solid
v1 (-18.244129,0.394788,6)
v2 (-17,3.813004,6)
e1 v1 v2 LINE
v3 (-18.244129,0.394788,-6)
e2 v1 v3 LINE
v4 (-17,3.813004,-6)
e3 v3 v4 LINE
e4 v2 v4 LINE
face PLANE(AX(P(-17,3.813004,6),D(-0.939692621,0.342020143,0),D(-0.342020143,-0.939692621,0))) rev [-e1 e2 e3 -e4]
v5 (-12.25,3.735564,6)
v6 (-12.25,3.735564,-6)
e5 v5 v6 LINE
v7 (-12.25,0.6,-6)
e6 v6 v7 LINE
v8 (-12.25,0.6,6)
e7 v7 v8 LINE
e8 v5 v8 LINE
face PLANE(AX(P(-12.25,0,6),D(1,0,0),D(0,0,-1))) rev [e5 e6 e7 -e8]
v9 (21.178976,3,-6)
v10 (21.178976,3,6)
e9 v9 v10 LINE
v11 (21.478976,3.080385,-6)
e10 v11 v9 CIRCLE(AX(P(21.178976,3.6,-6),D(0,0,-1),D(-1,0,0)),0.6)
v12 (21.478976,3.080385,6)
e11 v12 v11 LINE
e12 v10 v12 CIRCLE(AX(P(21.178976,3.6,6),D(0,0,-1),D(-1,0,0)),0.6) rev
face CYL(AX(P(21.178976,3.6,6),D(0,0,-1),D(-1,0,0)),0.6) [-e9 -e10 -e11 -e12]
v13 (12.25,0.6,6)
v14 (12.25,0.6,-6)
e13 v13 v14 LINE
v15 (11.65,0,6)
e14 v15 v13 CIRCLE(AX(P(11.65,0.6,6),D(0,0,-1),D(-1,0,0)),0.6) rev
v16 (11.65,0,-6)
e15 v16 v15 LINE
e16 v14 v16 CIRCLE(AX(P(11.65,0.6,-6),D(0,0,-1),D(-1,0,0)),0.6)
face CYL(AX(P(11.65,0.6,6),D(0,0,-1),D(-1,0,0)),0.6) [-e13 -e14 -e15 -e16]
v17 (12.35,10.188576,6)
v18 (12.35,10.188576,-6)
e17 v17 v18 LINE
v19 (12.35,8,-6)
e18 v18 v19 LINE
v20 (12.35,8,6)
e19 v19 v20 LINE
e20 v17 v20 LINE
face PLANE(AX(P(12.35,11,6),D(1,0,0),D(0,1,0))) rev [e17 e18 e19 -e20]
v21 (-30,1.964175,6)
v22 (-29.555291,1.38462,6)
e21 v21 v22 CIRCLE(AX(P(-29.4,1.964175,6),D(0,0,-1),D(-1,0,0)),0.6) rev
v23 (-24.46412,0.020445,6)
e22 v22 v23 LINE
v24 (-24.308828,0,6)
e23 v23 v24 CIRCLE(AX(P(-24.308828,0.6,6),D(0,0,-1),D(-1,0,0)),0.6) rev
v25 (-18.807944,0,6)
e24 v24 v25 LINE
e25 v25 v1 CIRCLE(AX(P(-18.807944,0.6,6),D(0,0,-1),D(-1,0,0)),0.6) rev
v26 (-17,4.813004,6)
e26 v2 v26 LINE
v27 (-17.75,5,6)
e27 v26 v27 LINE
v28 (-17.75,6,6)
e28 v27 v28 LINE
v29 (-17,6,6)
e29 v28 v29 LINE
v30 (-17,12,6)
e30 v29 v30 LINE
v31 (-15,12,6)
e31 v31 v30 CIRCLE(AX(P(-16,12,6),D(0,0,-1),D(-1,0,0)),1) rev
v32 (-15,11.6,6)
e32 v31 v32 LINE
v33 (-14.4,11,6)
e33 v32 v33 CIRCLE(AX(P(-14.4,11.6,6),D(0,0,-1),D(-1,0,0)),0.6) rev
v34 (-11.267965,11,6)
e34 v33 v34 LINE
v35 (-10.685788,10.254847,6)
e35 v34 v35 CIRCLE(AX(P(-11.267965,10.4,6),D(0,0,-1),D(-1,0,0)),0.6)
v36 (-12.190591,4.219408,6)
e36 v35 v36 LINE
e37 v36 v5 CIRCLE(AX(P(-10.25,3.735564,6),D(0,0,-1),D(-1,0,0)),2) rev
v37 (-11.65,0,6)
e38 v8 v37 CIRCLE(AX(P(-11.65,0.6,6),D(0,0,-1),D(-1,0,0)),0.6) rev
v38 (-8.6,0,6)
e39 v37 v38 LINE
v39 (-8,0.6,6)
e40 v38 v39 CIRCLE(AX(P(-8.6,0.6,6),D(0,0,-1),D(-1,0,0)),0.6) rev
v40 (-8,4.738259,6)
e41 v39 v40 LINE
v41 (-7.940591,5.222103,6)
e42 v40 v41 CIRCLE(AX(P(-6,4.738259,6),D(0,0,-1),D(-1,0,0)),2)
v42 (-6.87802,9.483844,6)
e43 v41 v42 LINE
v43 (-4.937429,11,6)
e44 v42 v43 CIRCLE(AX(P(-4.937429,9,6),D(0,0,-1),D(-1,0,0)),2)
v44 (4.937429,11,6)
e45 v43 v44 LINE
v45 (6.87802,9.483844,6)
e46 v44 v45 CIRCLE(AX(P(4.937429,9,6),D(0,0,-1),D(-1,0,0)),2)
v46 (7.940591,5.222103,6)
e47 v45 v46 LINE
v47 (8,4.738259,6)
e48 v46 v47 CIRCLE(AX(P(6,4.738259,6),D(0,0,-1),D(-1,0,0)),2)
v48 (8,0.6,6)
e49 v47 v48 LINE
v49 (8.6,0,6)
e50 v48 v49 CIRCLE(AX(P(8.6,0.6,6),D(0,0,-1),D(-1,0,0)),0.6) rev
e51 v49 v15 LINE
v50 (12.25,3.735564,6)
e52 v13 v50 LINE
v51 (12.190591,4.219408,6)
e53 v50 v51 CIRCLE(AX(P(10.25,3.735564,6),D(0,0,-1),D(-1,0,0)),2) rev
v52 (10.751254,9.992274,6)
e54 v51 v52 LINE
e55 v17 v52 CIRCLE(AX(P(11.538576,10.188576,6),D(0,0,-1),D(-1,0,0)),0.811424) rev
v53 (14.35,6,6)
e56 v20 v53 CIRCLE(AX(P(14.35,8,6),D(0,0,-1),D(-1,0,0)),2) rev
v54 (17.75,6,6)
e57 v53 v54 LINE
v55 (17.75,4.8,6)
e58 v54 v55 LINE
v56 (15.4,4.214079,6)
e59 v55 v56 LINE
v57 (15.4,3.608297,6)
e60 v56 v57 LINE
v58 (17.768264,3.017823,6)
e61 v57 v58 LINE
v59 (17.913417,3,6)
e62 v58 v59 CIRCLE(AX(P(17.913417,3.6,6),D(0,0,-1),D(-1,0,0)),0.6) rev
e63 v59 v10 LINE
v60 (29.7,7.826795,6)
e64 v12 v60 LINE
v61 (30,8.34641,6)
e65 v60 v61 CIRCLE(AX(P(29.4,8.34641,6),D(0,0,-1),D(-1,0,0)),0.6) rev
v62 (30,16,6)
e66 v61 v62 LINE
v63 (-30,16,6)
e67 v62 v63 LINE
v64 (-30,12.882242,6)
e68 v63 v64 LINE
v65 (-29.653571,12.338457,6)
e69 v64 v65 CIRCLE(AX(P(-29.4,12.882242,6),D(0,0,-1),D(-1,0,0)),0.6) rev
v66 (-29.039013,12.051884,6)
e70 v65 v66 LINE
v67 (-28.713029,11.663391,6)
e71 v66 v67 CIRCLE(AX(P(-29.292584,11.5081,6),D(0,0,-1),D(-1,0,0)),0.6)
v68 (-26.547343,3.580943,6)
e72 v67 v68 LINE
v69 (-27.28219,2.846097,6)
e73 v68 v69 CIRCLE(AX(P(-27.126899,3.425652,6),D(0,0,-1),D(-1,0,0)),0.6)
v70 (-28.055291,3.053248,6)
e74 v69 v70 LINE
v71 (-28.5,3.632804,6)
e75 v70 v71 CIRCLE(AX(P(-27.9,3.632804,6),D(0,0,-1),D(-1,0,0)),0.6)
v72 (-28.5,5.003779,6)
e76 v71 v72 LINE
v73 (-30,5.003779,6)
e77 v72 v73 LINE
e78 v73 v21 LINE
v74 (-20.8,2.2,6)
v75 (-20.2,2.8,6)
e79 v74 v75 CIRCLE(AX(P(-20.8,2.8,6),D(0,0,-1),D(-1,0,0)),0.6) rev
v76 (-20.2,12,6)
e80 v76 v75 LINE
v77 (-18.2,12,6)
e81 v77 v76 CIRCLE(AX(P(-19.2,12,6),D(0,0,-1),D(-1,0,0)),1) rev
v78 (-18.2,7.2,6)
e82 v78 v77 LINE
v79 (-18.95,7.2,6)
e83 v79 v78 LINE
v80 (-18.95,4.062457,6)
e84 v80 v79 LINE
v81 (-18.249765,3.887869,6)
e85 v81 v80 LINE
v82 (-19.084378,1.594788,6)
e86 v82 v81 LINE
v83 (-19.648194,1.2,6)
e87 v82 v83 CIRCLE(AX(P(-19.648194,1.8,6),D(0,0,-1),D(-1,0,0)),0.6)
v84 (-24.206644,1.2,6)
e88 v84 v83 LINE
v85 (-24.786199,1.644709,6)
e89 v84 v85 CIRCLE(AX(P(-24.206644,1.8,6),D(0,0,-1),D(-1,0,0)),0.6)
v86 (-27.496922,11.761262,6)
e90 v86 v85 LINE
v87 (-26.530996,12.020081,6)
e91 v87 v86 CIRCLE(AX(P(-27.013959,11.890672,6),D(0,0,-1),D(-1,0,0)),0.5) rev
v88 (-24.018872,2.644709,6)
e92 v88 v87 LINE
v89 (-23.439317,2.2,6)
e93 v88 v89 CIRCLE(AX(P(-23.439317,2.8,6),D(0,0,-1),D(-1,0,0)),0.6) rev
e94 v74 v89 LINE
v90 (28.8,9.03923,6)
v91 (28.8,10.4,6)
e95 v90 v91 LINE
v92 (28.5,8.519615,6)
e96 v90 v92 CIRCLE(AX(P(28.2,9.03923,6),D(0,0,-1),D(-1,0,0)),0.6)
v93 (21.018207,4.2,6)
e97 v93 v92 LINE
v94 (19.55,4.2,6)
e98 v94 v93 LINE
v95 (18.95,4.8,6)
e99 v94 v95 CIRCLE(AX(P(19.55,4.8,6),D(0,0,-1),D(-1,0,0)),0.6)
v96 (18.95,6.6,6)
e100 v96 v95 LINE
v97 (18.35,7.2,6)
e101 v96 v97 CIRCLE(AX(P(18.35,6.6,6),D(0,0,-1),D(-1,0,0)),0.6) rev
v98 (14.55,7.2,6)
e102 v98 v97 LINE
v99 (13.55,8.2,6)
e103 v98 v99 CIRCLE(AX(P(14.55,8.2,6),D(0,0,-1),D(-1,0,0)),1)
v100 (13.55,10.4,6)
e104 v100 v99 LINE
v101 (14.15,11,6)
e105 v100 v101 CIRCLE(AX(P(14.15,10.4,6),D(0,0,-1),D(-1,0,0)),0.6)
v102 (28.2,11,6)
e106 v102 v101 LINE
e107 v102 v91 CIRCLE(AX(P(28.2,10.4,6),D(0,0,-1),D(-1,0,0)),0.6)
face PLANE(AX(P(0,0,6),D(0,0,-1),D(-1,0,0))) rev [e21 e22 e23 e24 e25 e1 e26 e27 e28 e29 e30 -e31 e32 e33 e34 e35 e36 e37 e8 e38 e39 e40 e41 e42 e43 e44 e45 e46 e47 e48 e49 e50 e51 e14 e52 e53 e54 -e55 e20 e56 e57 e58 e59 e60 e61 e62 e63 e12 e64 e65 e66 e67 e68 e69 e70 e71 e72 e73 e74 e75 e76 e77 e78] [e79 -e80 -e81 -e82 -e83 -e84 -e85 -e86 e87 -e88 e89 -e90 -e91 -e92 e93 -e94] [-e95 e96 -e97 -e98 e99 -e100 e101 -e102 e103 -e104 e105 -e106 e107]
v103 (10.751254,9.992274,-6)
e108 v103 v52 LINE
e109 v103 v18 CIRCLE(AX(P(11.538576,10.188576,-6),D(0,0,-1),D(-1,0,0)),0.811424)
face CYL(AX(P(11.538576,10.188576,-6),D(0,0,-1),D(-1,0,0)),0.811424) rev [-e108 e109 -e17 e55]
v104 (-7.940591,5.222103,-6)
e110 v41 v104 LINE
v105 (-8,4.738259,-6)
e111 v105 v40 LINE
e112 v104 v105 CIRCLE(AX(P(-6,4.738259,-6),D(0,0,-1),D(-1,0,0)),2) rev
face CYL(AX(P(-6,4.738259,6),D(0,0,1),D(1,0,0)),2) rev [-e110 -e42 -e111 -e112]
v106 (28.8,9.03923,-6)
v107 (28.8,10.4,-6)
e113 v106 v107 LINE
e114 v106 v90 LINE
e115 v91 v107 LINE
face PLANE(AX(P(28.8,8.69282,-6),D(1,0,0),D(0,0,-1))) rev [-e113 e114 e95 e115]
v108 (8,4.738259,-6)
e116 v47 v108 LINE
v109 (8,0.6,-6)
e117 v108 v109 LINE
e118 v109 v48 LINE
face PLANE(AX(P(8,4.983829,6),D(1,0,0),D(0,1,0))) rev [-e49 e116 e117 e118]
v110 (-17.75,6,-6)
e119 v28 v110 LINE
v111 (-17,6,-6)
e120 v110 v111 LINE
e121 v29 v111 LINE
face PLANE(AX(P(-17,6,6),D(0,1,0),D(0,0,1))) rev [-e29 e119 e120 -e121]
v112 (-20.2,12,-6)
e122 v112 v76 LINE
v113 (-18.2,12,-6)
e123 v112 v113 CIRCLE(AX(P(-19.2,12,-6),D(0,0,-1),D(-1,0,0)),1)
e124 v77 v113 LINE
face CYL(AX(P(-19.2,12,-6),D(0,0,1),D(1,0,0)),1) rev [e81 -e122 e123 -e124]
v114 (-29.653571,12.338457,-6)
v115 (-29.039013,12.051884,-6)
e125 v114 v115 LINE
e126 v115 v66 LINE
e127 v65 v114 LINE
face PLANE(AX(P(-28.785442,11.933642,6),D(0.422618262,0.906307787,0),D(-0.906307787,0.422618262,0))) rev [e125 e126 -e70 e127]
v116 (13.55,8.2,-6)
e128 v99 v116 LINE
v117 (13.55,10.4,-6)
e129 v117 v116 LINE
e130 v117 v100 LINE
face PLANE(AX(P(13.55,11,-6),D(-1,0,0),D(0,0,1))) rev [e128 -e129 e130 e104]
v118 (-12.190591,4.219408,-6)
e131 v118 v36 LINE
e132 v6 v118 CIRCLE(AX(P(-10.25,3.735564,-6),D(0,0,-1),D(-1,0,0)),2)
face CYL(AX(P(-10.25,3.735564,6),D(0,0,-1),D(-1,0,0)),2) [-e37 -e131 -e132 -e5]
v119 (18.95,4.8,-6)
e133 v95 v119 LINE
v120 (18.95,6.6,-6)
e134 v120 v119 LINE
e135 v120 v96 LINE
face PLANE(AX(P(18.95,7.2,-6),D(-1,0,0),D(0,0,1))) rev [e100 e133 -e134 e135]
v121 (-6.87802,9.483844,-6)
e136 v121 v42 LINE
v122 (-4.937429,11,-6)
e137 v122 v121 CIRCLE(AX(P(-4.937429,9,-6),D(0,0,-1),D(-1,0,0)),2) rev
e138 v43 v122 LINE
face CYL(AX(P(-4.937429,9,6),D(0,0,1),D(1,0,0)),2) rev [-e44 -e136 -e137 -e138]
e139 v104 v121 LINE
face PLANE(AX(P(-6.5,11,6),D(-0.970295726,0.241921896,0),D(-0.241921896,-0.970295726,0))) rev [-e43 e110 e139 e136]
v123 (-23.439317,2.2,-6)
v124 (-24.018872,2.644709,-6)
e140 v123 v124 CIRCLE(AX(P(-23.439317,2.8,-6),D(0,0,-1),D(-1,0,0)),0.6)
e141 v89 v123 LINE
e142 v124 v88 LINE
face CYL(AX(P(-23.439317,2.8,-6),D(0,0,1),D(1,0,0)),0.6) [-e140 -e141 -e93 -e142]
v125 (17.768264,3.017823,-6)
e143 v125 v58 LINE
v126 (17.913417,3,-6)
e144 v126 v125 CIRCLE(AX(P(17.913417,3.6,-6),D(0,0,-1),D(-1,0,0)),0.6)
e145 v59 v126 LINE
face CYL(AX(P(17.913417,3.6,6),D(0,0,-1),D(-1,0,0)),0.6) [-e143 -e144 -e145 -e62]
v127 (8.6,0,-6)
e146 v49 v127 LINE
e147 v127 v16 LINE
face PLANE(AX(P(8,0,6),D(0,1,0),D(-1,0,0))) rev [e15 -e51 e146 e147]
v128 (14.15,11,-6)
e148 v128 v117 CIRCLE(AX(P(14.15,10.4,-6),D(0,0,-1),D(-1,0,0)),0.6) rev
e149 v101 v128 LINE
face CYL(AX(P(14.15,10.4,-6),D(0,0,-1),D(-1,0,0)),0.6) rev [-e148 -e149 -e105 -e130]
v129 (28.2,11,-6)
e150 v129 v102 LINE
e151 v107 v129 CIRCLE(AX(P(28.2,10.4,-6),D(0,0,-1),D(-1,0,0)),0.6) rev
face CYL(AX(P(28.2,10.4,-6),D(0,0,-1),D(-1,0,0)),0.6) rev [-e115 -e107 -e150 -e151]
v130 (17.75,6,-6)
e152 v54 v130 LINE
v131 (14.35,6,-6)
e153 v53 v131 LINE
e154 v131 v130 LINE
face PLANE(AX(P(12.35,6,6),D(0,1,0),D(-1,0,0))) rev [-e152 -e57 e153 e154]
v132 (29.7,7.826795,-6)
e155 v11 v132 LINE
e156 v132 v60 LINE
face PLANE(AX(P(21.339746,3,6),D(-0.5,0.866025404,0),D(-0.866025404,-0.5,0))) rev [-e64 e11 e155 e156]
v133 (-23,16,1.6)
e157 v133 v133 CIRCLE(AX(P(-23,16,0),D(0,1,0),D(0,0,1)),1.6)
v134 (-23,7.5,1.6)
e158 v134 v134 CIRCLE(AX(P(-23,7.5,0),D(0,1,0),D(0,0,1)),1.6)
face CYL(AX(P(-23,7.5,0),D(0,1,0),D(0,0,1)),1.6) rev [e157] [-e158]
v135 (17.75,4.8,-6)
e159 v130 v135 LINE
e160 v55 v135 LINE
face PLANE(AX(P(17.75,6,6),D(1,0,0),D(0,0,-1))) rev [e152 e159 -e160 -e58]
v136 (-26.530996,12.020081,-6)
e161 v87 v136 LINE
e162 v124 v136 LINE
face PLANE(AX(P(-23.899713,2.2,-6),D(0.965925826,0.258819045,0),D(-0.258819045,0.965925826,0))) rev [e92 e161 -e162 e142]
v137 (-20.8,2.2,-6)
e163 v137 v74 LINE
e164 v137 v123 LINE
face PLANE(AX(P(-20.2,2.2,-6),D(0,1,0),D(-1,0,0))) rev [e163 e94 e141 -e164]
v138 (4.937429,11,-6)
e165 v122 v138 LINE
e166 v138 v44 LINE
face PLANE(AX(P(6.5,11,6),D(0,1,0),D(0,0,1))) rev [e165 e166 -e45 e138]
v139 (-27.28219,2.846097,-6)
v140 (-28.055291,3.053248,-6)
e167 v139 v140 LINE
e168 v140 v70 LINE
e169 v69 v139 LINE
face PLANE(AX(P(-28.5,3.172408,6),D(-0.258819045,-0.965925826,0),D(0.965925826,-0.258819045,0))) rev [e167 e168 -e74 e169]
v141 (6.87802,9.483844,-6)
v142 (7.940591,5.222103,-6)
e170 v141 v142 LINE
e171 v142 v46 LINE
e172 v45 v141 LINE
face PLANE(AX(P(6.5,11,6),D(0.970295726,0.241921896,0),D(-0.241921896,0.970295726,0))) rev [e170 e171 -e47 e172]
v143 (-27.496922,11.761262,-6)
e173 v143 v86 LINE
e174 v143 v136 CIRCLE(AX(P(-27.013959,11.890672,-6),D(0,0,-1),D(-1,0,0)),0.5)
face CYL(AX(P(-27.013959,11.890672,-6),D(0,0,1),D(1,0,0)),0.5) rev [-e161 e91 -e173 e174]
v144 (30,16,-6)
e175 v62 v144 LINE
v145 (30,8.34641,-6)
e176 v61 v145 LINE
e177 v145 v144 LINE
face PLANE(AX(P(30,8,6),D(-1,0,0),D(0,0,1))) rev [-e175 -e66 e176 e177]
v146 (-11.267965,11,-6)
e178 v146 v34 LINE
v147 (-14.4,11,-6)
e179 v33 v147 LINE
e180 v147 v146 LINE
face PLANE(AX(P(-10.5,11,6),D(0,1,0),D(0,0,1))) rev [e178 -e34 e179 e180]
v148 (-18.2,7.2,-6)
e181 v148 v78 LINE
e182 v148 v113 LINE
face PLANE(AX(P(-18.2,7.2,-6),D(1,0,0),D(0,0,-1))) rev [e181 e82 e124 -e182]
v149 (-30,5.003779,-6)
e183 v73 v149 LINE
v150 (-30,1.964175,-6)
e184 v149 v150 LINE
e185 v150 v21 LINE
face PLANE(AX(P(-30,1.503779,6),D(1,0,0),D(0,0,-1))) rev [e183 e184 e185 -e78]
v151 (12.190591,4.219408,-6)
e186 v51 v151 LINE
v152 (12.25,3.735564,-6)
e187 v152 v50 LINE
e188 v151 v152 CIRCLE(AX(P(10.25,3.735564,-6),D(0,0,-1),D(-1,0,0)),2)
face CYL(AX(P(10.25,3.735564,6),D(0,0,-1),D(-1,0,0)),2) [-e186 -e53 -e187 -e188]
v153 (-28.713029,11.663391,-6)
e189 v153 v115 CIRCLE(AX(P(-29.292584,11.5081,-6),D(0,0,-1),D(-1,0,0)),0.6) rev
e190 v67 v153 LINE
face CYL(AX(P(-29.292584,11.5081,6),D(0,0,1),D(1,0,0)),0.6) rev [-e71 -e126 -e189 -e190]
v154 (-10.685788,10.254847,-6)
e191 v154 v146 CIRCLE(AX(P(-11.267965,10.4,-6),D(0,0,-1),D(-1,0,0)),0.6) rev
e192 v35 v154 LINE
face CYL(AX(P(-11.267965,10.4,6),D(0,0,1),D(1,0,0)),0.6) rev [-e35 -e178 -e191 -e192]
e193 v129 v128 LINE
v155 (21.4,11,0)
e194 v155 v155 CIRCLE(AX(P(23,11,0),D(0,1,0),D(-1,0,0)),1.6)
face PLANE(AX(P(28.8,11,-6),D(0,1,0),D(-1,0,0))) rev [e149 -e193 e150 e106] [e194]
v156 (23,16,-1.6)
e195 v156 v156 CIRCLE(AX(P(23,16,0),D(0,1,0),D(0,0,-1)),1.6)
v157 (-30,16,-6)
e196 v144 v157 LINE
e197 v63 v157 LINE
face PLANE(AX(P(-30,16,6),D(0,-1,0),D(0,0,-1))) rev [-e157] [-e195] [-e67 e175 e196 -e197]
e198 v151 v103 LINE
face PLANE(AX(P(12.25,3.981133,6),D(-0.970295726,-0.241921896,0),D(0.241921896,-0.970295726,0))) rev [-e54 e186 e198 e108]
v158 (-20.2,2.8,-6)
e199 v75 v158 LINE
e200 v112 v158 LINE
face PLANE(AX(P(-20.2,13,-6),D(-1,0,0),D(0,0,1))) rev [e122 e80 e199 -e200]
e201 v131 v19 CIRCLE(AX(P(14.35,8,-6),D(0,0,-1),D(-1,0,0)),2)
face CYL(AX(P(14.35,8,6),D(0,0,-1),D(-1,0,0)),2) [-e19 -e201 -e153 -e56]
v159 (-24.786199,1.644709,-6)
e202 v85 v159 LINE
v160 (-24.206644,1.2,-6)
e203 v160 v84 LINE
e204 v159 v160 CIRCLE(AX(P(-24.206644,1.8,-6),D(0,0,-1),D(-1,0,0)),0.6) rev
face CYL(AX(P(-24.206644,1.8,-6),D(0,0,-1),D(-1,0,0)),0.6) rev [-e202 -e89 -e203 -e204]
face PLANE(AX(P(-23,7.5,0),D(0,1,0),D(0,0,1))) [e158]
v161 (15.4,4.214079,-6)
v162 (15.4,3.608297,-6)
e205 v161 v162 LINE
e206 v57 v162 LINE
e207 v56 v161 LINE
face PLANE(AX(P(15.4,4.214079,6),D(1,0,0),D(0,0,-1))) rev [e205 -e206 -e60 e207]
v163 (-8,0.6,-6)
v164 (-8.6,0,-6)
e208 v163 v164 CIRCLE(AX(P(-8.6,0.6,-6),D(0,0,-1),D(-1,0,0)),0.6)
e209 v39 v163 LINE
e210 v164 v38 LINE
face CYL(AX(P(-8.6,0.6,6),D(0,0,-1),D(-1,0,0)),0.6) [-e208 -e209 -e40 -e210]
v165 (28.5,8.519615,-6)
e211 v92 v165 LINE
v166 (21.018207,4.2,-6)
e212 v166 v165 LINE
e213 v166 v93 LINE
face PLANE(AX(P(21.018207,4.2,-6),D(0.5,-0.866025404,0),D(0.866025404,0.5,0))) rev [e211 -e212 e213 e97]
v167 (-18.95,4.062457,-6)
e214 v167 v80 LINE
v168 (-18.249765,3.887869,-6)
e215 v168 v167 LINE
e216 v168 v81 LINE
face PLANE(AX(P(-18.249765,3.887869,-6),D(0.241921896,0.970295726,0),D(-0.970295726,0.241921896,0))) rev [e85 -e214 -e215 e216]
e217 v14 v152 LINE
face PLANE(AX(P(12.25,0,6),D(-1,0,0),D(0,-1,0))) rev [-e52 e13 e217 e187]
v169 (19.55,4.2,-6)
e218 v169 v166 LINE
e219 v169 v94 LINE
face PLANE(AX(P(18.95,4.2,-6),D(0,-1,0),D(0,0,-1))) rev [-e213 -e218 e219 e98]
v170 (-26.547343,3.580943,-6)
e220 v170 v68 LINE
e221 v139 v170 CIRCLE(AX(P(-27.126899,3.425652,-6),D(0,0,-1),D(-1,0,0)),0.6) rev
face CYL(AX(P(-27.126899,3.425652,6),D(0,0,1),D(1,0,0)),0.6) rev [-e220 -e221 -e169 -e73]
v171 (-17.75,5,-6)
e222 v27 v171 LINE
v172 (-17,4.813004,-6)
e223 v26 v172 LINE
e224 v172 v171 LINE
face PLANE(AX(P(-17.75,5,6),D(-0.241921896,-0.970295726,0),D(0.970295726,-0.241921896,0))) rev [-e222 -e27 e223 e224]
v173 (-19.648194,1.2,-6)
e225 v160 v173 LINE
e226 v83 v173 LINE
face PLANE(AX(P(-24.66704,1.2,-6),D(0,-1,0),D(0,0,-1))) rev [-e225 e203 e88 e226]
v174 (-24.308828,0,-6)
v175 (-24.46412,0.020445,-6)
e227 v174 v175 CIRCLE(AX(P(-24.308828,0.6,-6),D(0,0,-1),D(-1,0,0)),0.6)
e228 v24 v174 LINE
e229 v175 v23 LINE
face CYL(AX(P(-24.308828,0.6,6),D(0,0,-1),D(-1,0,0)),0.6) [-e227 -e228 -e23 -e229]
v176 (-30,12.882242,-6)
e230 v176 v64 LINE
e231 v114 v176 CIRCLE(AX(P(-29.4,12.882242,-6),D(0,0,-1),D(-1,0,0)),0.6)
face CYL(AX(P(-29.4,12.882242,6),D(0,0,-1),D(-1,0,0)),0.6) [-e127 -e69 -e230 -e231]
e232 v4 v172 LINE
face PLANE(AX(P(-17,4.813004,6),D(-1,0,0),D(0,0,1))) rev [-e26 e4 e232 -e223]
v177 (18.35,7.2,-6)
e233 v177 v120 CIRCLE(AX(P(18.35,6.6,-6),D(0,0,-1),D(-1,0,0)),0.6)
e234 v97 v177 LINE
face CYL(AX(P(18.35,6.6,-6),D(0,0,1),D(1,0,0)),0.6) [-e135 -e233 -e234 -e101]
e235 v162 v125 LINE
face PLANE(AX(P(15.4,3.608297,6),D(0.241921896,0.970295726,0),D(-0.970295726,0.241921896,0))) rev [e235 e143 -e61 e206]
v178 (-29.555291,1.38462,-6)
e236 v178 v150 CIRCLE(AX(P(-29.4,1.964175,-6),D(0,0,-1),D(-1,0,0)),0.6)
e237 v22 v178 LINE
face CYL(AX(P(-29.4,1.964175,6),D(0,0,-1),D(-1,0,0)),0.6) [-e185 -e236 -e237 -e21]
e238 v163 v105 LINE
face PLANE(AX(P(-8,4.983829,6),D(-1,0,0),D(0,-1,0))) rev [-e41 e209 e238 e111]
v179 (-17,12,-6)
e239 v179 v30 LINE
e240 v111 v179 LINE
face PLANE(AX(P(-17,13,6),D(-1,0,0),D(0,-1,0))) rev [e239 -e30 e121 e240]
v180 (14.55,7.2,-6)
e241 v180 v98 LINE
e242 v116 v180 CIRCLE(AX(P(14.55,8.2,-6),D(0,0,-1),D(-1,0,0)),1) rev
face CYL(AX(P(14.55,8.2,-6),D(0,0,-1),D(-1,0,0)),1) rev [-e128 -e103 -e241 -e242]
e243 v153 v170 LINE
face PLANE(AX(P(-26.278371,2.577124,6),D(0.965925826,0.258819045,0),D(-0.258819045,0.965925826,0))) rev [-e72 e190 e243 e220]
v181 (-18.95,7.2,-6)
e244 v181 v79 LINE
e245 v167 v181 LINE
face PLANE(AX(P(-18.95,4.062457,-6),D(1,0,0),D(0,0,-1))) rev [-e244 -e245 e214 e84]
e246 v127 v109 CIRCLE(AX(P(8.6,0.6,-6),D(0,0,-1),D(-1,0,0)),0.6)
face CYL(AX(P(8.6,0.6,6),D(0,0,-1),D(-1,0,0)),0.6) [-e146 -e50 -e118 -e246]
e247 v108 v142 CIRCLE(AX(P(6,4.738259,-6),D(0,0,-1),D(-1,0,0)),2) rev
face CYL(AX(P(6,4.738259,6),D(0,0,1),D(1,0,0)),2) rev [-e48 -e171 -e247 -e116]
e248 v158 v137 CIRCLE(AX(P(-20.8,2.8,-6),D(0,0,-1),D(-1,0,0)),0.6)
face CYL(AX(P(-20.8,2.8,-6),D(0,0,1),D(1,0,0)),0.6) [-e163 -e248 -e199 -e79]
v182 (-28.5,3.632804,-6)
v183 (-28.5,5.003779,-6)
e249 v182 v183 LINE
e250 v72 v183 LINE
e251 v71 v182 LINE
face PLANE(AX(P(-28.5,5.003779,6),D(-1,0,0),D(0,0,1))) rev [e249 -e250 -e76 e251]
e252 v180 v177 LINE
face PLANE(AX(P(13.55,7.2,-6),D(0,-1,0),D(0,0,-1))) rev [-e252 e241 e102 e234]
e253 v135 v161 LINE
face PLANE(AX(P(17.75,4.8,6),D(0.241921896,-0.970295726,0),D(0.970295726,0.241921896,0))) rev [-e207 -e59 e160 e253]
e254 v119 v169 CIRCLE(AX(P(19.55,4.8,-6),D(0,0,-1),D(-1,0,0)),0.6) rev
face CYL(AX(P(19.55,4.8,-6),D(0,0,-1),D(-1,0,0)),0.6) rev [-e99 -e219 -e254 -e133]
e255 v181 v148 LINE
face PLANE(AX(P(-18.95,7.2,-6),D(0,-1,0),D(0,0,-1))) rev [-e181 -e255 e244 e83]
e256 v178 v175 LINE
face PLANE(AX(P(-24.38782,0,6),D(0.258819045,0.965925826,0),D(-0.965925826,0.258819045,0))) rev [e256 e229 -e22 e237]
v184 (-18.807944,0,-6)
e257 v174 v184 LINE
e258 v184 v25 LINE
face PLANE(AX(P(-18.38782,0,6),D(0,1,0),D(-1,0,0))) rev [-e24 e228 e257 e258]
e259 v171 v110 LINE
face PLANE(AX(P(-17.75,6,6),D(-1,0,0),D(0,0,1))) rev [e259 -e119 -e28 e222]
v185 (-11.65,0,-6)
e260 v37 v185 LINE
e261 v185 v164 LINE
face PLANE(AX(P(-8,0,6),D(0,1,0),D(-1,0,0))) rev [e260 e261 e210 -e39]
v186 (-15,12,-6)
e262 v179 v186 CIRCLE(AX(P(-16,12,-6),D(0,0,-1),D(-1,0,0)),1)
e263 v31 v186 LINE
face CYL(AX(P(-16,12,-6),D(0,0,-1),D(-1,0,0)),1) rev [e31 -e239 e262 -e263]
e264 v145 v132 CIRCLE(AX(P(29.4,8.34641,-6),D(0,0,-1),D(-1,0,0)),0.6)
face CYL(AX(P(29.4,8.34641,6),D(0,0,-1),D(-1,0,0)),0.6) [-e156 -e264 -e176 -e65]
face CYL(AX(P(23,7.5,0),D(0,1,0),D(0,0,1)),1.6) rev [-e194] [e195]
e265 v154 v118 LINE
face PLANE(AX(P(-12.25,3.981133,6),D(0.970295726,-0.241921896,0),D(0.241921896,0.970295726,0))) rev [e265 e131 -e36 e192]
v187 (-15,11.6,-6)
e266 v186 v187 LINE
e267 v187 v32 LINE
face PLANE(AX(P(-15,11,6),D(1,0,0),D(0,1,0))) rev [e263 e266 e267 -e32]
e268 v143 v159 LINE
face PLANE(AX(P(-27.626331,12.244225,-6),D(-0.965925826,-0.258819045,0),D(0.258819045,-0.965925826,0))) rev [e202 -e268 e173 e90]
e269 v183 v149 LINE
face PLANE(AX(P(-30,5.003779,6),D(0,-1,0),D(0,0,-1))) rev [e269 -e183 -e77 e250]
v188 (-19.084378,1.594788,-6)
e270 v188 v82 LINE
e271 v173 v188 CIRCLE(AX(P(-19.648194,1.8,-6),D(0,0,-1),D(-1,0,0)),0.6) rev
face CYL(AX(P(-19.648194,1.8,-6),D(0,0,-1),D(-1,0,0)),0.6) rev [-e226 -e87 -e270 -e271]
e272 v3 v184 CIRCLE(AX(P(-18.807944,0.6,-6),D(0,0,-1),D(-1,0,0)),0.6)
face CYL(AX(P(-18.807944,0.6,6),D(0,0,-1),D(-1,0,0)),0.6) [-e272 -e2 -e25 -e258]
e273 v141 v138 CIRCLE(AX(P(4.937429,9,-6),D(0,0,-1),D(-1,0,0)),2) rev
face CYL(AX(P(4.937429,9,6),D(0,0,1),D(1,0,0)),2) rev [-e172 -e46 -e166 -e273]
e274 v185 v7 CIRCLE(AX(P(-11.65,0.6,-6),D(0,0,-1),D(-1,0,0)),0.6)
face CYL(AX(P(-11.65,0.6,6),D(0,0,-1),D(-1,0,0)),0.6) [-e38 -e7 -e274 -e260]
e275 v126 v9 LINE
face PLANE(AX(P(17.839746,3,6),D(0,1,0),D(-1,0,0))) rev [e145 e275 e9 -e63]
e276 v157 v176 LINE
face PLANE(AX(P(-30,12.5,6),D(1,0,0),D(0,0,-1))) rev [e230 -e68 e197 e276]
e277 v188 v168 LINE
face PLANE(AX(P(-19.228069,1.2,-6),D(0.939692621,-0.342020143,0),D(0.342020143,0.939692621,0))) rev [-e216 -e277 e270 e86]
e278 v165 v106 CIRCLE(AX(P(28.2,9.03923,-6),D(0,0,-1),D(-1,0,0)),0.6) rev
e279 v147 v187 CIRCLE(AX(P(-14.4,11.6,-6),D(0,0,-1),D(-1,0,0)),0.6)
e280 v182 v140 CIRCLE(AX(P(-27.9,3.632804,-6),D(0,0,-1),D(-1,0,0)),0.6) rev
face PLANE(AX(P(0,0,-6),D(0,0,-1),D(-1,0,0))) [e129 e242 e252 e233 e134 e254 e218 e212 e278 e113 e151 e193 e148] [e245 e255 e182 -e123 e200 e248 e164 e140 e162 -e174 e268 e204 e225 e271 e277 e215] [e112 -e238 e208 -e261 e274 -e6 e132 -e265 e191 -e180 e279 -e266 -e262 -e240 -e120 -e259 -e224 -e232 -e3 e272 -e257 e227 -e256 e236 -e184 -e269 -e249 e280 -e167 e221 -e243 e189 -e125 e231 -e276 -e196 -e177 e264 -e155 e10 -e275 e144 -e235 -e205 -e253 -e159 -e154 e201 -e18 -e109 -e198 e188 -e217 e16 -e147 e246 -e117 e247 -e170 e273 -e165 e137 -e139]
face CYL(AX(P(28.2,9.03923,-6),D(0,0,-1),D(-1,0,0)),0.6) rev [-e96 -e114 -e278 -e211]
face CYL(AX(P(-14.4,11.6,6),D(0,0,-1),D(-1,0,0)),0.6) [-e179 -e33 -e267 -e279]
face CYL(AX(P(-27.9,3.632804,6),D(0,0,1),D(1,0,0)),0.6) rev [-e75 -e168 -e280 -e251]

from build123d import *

# Parameters (mm, degrees)
BOSS_EXTRUDE1_DEPTH     = 6
CUT_EXTRUDE1_DEPTH      = 35.525353003
CUT_EXTRUDE1_DEPTH_BACK = 35.525353003
FILLET1_R               = 2
FILLET2_R               = 1
FILLET3_R               = 0.811424
FILLET4_R               = 2
FILLET5_R               = 1
FILLET6_R               = 1
FILLET7_R               = 0.5
FILLET8_R               = 0.6
SKETCH4_R               = 1.6
CUT_EXTRUDE2_DEPTH      = 8.5


with BuildPart() as part:
    # Sketch2 → Boss-Extrude1 (new, symmetric)
    with BuildSketch(Plane.XY):
        Polygon((6.5, 11), (-6.5, 11), (-8, 4.9838286), (-8, 0), (-12.25, 0), (-12.25, 3.981133366), (-10.5, 11), (-15, 11), (-15, 13), (-17, 13), (-17, 6), (-17.75, 6), (-17.75, 5), (-17, 4.813003998), (-17, 3.813003998), (-18.387819958, 0), (-24.387819958, 0), (-30, 1.50377911), (-30, 5.00377911), (-28.5, 5.00377911), (-28.5, 3.172407682), (-26.2783706, 2.577123878), (-28.785442178, 11.933642386), (-30, 12.5), (-30, 16), (0, 16), (30, 16), (30, 8), (21.339745962, 3), (17.839745962, 3), (15.4, 3.608296988), (15.4, 4.214079193), (17.75, 4.8), (17.75, 6), (12.35, 6), (12.35, 11), (10.5, 11), (12.25, 3.981133366), (12.25, 0), (8, 0), (8, 4.9838286), align=None)
    extrude(amount=BOSS_EXTRUDE1_DEPTH, both=True)

    # Sketch3 → Cut-Extrude1 (cut, two sides: drawn at the far end of the back side and taken through both)
    with BuildSketch(Plane.XY.offset(-CUT_EXTRUDE1_DEPTH_BACK)):
        Polygon((-27.626331186, 12.24422524), (-24.667039952, 1.2), (-19.228069004, 1.2), (-18.249764702, 3.88786898), (-18.95, 4.062457248), (-18.95, 7.2), (-18.2, 7.2), (-18.2, 13), (-20.2, 13), (-20.2, 2.2), (-23.899712964, 2.2), (-26.66040536, 12.503044285), align=None)
        Polygon((13.55, 11), (13.55, 7.2), (18.95, 7.2), (18.95, 4.2), (21.018206931, 4.2), (28.8, 8.692820323), (28.8, 11), align=None)
    extrude(amount=CUT_EXTRUDE1_DEPTH + CUT_EXTRUDE1_DEPTH_BACK, mode=Mode.SUBTRACT)

    # Fillet1
    fillet1_edges = [part.edges().sort_by_distance(p)[0] for p in [
        (12.35, 6, 0),
    ]]
    fillet(fillet1_edges, radius=FILLET1_R)

    # Fillet2
    fillet2_edges = [part.edges().sort_by_distance(p)[0] for p in [
        (13.55, 7.2, 0),
    ]]
    fillet(fillet2_edges, radius=FILLET2_R)

    # Fillet3
    fillet3_edges = [part.edges().sort_by_distance(p)[0] for p in [
        (12.35, 11, 0),
        (10.5, 11, 0),
    ]]
    fillet(fillet3_edges, radius=FILLET3_R)

    # Fillet4
    fillet4_edges = [part.edges().sort_by_distance(p)[0] for p in [
        (12.25, 3.981133366, 0),
        (8, 4.9838286, 0),
        (6.5, 11, 0),
        (-6.5, 11, 0),
        (-8, 4.9838286, 0),
        (-12.25, 3.981133366, 0),
    ]]
    fillet(fillet4_edges, radius=FILLET4_R)

    # Fillet5
    fillet5_edges = [part.edges().sort_by_distance(p)[0] for p in [
        (-20.2, 13, 0),
        (-18.2, 13, 0),
    ]]
    fillet(fillet5_edges, radius=FILLET5_R - 0.0001)  # a hair under: the kernel refuses the full size

    # Fillet6
    fillet6_edges = [part.edges().sort_by_distance(p)[0] for p in [
        (-15, 13, 0),
        (-17, 13, 0),
    ]]
    fillet(fillet6_edges, radius=FILLET6_R - 0.0001)  # a hair under: the kernel refuses the full size

    # Fillet7
    fillet7_edges = [part.edges().sort_by_distance(p)[0] for p in [
        (-27.626331186, 12.24422524, 0),
        (-26.66040536, 12.503044285, 0),
    ]]
    fillet(fillet7_edges, radius=FILLET7_R - 0.0001)  # a hair under: the kernel refuses the full size

    # Fillet8
    fillet8_edges = [part.edges().sort_by_distance(p)[0] for p in [
        (-23.899712964, 2.2, 0),
        (-20.2, 2.2, 0),
        (-19.228069004, 1.2, 0),
        (-24.667039952, 1.2, 0),
        (13.55, 11, 0),
        (28.8, 11, 0),
        (28.8, 8.692820323, 0),
        (18.95, 4.2, 0),
        (18.95, 7.2, 0),
        (12.25, 0, 0),
        (8, 0, 0),
        (-8, 0, 0),
        (-12.25, 0, 0),
        (-10.5, 11, 0),
        (-15, 11, 0),
        (-18.387819958, 0, 0),
        (-24.387819958, 0, 0),
        (-30, 1.50377911, 0),
        (-28.5, 3.172407682, 0),
        (-26.2783706, 2.577123878, 0),
        (-28.785442178, 11.933642386, 0),
        (-30, 12.5, 0),
        (30, 8, 0),
        (21.339745962, 3, 0),
        (17.839745962, 3, 0),
    ]]
    fillet(fillet8_edges, radius=FILLET8_R)

    # Sketch4 → Cut-Extrude2 (cut)
    with BuildSketch(Plane(origin=(0, 16, 0), x_dir=(1, 0, 0), z_dir=(0, 1, 0))):
        with Locations(Location((-23, 0, 0), (0, 0, 270))):
            Circle(SKETCH4_R)
        with Locations(Location((23, 0, 0), (0, 0, 180))):
            Circle(SKETCH4_R)
    extrude(amount=-CUT_EXTRUDE2_DEPTH, mode=Mode.SUBTRACT)


solid = part.part
